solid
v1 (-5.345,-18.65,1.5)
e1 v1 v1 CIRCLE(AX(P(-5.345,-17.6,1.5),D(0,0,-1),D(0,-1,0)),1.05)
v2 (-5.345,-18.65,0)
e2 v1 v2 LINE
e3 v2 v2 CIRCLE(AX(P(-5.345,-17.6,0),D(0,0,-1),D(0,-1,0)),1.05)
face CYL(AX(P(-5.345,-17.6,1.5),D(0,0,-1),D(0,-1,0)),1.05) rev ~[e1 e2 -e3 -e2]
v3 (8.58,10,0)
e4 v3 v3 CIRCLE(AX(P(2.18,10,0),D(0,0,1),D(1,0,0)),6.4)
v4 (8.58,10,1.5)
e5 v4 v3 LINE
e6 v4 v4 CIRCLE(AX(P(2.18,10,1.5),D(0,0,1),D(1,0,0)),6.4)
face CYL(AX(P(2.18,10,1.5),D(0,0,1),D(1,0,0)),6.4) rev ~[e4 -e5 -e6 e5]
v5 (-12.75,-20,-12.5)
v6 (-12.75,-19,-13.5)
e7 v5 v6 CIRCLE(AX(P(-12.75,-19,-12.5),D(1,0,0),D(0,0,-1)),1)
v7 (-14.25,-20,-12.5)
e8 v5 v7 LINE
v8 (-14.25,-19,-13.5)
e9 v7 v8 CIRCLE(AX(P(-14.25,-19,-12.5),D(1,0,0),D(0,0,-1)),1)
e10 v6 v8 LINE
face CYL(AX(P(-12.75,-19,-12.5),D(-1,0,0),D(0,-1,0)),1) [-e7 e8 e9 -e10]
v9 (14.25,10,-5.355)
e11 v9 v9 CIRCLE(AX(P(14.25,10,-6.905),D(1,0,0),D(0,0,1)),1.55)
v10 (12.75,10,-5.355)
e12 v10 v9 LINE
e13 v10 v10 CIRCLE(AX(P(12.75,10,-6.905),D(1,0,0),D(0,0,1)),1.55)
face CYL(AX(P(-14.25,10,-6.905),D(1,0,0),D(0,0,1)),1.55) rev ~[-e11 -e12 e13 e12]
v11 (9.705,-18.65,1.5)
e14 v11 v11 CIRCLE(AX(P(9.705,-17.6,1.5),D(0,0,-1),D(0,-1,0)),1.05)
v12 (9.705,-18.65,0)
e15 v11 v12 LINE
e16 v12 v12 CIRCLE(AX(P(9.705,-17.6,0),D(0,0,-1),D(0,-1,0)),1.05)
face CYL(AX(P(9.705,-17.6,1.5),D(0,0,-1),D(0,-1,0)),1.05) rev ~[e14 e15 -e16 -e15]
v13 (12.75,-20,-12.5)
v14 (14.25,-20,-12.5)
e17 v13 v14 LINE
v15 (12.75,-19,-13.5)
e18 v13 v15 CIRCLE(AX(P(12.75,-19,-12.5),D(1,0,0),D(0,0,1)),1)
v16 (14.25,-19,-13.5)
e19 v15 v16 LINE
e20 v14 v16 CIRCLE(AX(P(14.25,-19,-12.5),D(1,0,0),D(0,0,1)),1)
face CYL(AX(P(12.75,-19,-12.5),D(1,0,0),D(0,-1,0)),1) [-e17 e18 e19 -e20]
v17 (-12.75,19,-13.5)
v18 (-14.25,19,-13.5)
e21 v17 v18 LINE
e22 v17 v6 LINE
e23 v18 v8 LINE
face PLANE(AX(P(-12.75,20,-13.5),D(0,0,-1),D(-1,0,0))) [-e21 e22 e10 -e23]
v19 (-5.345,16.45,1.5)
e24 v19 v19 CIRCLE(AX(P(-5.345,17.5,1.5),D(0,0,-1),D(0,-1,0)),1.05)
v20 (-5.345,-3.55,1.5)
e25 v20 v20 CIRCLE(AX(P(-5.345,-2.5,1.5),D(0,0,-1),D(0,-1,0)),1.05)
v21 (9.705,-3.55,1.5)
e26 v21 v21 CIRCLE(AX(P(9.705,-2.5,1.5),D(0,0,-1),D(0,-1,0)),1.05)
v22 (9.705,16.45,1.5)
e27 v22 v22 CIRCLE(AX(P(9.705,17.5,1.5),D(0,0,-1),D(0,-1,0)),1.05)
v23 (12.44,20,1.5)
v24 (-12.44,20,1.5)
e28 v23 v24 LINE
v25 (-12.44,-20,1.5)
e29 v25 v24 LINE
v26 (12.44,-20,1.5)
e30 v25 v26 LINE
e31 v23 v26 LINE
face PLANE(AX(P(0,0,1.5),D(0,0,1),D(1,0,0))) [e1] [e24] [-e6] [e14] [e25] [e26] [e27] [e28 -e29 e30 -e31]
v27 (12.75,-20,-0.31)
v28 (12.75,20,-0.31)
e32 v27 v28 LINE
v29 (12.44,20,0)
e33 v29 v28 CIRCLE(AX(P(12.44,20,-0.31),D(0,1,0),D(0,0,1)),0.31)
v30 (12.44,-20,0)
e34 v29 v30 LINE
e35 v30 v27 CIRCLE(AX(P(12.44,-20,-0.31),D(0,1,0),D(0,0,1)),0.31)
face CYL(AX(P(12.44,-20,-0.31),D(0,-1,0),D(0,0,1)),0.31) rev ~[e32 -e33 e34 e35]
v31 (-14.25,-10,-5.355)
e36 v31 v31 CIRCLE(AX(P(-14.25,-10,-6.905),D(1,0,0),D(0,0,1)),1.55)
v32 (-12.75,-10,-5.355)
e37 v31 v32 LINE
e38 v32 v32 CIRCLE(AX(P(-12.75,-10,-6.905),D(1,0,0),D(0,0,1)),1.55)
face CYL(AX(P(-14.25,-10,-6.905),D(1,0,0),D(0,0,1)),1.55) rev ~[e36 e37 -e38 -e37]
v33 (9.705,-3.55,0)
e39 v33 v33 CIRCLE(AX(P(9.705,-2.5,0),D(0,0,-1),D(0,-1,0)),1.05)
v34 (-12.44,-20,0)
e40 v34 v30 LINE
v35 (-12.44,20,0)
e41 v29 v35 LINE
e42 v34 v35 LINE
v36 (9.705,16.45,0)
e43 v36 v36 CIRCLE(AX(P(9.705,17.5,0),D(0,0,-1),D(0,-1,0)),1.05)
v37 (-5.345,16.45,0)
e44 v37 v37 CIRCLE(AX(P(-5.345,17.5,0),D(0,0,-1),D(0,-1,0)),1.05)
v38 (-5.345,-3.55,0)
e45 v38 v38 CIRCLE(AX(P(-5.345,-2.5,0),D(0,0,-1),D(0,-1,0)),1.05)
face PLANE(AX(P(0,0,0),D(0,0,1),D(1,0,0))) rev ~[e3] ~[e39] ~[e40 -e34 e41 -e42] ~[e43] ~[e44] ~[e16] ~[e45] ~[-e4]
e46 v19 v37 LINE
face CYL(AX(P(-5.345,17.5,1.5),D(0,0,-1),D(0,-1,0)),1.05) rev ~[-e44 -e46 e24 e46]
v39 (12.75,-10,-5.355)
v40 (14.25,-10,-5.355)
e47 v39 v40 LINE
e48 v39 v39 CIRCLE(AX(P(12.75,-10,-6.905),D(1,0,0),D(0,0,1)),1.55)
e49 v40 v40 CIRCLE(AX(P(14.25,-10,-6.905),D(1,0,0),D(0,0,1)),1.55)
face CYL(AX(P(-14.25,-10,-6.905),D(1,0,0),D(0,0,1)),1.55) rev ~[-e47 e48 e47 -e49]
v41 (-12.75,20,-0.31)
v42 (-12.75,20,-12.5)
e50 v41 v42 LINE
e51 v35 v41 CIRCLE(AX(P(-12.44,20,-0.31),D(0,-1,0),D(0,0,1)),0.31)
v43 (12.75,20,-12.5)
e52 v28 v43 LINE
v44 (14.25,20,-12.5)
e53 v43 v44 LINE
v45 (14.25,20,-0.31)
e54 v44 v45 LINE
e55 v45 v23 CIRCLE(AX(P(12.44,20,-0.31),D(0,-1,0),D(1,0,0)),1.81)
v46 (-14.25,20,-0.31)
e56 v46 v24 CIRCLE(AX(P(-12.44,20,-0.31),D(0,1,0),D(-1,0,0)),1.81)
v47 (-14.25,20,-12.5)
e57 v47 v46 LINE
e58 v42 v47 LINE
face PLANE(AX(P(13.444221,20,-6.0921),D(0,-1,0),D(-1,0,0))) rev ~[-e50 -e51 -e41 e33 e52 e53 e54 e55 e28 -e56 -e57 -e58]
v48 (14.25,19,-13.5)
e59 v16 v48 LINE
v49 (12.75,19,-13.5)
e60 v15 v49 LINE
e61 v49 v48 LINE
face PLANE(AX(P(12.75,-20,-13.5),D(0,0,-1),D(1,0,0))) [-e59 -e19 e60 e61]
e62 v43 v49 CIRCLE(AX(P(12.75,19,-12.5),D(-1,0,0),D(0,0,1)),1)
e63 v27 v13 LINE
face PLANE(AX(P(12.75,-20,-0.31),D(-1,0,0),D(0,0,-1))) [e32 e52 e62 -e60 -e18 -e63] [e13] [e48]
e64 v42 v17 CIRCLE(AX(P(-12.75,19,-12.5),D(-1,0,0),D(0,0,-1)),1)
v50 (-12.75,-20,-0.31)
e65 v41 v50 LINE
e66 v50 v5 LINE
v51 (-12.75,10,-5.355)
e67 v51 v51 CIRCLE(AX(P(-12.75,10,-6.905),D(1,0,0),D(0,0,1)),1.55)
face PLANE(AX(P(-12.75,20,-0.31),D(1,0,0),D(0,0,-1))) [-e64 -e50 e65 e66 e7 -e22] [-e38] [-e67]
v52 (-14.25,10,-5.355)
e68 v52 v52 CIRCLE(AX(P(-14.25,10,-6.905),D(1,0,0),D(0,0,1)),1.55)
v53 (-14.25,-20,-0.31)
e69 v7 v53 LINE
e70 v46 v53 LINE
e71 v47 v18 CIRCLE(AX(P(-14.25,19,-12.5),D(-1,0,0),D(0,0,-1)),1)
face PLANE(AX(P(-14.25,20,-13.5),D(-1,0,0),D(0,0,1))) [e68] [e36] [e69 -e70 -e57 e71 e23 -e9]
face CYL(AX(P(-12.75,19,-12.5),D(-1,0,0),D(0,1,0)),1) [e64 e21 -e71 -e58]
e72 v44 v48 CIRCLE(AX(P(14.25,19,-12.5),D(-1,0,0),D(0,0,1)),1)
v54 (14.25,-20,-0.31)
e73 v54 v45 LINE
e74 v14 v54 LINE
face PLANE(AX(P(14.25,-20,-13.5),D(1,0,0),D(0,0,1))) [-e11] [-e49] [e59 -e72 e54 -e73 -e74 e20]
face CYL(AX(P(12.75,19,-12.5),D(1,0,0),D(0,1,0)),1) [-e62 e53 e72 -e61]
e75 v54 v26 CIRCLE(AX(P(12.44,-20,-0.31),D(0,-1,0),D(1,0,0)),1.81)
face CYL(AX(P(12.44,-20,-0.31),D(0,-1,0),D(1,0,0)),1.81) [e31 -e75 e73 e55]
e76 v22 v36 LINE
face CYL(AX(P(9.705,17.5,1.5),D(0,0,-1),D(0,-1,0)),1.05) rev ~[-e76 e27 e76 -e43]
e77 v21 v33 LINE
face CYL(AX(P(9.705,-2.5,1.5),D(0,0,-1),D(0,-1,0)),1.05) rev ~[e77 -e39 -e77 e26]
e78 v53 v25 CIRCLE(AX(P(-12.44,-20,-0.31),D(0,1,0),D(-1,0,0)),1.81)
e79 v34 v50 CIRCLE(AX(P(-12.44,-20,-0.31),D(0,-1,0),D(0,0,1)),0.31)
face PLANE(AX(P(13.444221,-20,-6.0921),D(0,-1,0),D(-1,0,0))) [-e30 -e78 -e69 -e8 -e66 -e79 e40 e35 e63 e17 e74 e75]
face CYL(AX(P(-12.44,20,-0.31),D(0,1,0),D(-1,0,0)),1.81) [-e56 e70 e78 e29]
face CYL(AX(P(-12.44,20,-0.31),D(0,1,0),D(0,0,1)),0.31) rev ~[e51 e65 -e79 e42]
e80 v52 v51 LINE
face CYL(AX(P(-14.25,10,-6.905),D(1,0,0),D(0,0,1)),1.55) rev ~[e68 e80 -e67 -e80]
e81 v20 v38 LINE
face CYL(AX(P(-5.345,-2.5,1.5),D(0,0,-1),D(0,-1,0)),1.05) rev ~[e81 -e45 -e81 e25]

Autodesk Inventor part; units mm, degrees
ref_plane "YZ Plane" through (0, 0, 0) normal (1, 0, 0) x (0, 1, 0)
ref_plane "XZ Plane" through (0, 0, 0) normal (0, 1, 0) x (-1, 0, 0)
ref_plane "XY Plane" through (0, 0, 0) normal (0, 0, 1) x (1, 0, 0)
sketch "Sketch1" plane through (0, 0, 0) normal (0, 0, 1) x (1, 0, 0)
  line L0 (-14.25, -20) -> (14.25, -20)
  line L1 (14.25, -20) -> (14.25, 20)
  line L2 (14.25, 20) -> (-14.25, 20)
  line L3 (-14.25, 20) -> (-14.25, -20)
  line L4 (-14.25, -20) -> (14.25, 20) construction
  line L5 (14.25, -20) -> (-14.25, 20) construction
  point P0 (0, 0)
  dimension "d0" = 28.5
  dimension "d1" = 40
extrude "Plate1" add sketch "Sketch1" along normal blind 1.5
sketch "Sketch2" plane through (12.75, -20, 1.5) normal (1, 0, 0) x (0, 1, 0)
  line L0 (40, 0) -> (0, 0)
  line L1 (0, 0) -> (0, -15)
  line L2 (0, -15) -> (40, -15)
  line L3 (40, -15) -> (40, 0)
edge flange "Flange1" height 15 angle 90 thickness 1.5 bend radius 0.31 thickness toward (1, 0, 0) relief tear relief width 1.5 relief depth 0.75 corner gap 0.31 corner form 0 edges at (14.25, 0, 0) (-14.25, 0, 0) wall of the first edge with corners at (12.75, 20, 1.5) (12.75, -20, 1.5) (12.75, -20, -13.5) (12.75, 20, -13.5)
bend "Bend1"
corner "Corner1"
sketch "Sketch3" plane through (0, 0, 1.5) normal (0, 0, 1) x (1, 0, 0)
  ellipse E0 centre (-5.772, 17.882) end of major axis (-6.638, 18.748) minor radius 1 (-5.9956, 19) -> (-6.89, 18.1056) ccw projected
  line L0 (10.3556, 19) -> (-5.9956, 19) projected
  ellipse E1 centre (10.132, 17.882) end of major axis (10.998, 18.748) minor radius 1 (11.25, 18.1056) -> (10.3556, 19) ccw projected
  line L1 (11.25, -18.2056) -> (11.25, 18.1056) projected
  ellipse E2 centre (10.132, -17.982) end of major axis (10.998, -18.848) minor radius 1 (10.3556, -19.1) -> (11.25, -18.2056) ccw projected
  line L2 (-5.9956, -19.1) -> (10.3556, -19.1) projected
  ellipse E3 centre (-5.772, -17.982) end of major axis (-6.638, -18.848) minor radius 1 (-6.89, -18.2056) -> (-5.9956, -19.1) ccw projected
  line L3 (-6.89, 18.1056) -> (-6.89, -18.2056) projected
  circle A0 centre (9.705, -17.6) radius 0.7835 projected
  circle A1 centre (-5.345, -17.6) radius 0.7835 projected
  circle A2 centre (9.705, -2.5) radius 0.7835 projected
  circle A3 centre (-5.345, -2.5) radius 0.7835 projected
  circle A4 centre (9.705, 17.5) radius 0.7835 projected
  circle A5 centre (-5.345, 17.5) radius 0.7835 projected
  circle A6 centre (2.18, 10) radius 6.4 projected
  point P0 (0, 0)
hole "Hole1" at (-5.345, -17.6, 1.5) at (9.705, -17.6, 1.5) at (9.705, -2.5, 1.5) at (-5.345, -2.5, 1.5) at (-5.345, 17.5, 1.5) at (9.705, 17.5, 1.5) direction (0, 0, -1) diameter 2.1 depth 1.5
sketch "Sketch4" plane through (0, 0, 1.5) normal (0, 0, 1) x (1, 0, 0)
  ellipse E0 centre (-5.772, 17.882) end of major axis (-6.638, 18.748) minor radius 1 (-5.9956, 19) -> (-6.89, 18.1056) ccw projected
  line L0 (10.3556, 19) -> (-5.9956, 19) projected
  ellipse E1 centre (10.132, 17.882) end of major axis (10.998, 18.748) minor radius 1 (11.25, 18.1056) -> (10.3556, 19) ccw projected
  line L1 (11.25, -18.2056) -> (11.25, 18.1056) projected
  ellipse E2 centre (10.132, -17.982) end of major axis (10.998, -18.848) minor radius 1 (10.3556, -19.1) -> (11.25, -18.2056) ccw projected
  line L2 (-5.9956, -19.1) -> (10.3556, -19.1) projected
  ellipse E3 centre (-5.772, -17.982) end of major axis (-6.638, -18.848) minor radius 1 (-6.89, -18.2056) -> (-5.9956, -19.1) ccw projected
  line L3 (-6.89, 18.1056) -> (-6.89, -18.2056) projected
  circle A0 centre (9.705, -17.6) radius 0.7835 projected
  circle A1 centre (-5.345, -17.6) radius 0.7835 projected
  circle A2 centre (9.705, -2.5) radius 0.7835 projected
  circle A3 centre (-5.345, -2.5) radius 0.7835 projected
  circle A4 centre (9.705, 17.5) radius 0.7835 projected
  circle A5 centre (-5.345, 17.5) radius 0.7835 projected
  circle A6 centre (2.18, 10) radius 6.4 projected
  point P0 (0, 0)
extrude "Extrusion1" cut sketch "Sketch4" against normal blind 1.5 contours A6
fillet "Corner Round1" radius 1 4 edges at (13.5, 20, -13.5) (13.5, -20, -13.5) (-13.5, 20, -13.5) (-13.5, -20, -13.5)
sketch "Sketch5" plane through (-14.25, -20, -0.31) normal (-1, 0, 0) x (0, 0, 1)
  line L0 (-6.595, 40) -> (-6.595, 0)
  line L1 (-12.19, 40) -> (0, 40) projected
  line L2 (0, 0) -> (0, 40) projected
  circle A0 centre (-6.595, 30) radius 1.55
  circle A1 centre (-6.595, 10) radius 1.55
  line L3 (0, 0) -> (-12.19, 0) projected
  point P0 (0.31, 20)
  dimension "d23" = 40
  dimension "d24" = 6.595
  dimension "d25" = 3.1
  dimension "d26" = 3.1
  dimension "d27" = 10
  dimension "d28" = 10
hole "Hole2" at (-14.25, 10, -6.905) at (-14.25, -10, -6.905) direction (1, 0, 0) diameter 3.1 end through all
equation "\"d18\" = Thickness"
equation "\"d34\" = Thickness"
equation "\"d2\" = Thickness"
equation "\"d3\" = BendReliefWidth"
equation "\"d4\" = BendReliefDepth"
equation "\"d5\" = MinimumRemnant"
equation "\"d6\" = TransitionRadius"
equation "\"d9\" = BendRadius"
equation "\"d10\" = CornerReliefSize"
equation "\"d11\" = GapSize"
equation "\"d12\" = JacobiRadiusSize"
equation "\"BendReliefWidth\" = Thickness"
equation "\"BendReliefDepth\" = 0.5 * Thickness"
equation "\"CornerReliefSize\" = 4 * Thickness"
equation "\"MinimumRemnant\" = 2 * Thickness"
equation "\"TransitionRadius\" = BendRadius"
equation "\"JacobiRadiusSize\" = BendRadius"
equation "\"GapSize\" = Thickness"
equation "\"Thickness\" = 1.5"
equation "\"BendRadius\" = 0.31"
properties part number "body_motor_L_frame" material "Aluminum 6061-AHC"
